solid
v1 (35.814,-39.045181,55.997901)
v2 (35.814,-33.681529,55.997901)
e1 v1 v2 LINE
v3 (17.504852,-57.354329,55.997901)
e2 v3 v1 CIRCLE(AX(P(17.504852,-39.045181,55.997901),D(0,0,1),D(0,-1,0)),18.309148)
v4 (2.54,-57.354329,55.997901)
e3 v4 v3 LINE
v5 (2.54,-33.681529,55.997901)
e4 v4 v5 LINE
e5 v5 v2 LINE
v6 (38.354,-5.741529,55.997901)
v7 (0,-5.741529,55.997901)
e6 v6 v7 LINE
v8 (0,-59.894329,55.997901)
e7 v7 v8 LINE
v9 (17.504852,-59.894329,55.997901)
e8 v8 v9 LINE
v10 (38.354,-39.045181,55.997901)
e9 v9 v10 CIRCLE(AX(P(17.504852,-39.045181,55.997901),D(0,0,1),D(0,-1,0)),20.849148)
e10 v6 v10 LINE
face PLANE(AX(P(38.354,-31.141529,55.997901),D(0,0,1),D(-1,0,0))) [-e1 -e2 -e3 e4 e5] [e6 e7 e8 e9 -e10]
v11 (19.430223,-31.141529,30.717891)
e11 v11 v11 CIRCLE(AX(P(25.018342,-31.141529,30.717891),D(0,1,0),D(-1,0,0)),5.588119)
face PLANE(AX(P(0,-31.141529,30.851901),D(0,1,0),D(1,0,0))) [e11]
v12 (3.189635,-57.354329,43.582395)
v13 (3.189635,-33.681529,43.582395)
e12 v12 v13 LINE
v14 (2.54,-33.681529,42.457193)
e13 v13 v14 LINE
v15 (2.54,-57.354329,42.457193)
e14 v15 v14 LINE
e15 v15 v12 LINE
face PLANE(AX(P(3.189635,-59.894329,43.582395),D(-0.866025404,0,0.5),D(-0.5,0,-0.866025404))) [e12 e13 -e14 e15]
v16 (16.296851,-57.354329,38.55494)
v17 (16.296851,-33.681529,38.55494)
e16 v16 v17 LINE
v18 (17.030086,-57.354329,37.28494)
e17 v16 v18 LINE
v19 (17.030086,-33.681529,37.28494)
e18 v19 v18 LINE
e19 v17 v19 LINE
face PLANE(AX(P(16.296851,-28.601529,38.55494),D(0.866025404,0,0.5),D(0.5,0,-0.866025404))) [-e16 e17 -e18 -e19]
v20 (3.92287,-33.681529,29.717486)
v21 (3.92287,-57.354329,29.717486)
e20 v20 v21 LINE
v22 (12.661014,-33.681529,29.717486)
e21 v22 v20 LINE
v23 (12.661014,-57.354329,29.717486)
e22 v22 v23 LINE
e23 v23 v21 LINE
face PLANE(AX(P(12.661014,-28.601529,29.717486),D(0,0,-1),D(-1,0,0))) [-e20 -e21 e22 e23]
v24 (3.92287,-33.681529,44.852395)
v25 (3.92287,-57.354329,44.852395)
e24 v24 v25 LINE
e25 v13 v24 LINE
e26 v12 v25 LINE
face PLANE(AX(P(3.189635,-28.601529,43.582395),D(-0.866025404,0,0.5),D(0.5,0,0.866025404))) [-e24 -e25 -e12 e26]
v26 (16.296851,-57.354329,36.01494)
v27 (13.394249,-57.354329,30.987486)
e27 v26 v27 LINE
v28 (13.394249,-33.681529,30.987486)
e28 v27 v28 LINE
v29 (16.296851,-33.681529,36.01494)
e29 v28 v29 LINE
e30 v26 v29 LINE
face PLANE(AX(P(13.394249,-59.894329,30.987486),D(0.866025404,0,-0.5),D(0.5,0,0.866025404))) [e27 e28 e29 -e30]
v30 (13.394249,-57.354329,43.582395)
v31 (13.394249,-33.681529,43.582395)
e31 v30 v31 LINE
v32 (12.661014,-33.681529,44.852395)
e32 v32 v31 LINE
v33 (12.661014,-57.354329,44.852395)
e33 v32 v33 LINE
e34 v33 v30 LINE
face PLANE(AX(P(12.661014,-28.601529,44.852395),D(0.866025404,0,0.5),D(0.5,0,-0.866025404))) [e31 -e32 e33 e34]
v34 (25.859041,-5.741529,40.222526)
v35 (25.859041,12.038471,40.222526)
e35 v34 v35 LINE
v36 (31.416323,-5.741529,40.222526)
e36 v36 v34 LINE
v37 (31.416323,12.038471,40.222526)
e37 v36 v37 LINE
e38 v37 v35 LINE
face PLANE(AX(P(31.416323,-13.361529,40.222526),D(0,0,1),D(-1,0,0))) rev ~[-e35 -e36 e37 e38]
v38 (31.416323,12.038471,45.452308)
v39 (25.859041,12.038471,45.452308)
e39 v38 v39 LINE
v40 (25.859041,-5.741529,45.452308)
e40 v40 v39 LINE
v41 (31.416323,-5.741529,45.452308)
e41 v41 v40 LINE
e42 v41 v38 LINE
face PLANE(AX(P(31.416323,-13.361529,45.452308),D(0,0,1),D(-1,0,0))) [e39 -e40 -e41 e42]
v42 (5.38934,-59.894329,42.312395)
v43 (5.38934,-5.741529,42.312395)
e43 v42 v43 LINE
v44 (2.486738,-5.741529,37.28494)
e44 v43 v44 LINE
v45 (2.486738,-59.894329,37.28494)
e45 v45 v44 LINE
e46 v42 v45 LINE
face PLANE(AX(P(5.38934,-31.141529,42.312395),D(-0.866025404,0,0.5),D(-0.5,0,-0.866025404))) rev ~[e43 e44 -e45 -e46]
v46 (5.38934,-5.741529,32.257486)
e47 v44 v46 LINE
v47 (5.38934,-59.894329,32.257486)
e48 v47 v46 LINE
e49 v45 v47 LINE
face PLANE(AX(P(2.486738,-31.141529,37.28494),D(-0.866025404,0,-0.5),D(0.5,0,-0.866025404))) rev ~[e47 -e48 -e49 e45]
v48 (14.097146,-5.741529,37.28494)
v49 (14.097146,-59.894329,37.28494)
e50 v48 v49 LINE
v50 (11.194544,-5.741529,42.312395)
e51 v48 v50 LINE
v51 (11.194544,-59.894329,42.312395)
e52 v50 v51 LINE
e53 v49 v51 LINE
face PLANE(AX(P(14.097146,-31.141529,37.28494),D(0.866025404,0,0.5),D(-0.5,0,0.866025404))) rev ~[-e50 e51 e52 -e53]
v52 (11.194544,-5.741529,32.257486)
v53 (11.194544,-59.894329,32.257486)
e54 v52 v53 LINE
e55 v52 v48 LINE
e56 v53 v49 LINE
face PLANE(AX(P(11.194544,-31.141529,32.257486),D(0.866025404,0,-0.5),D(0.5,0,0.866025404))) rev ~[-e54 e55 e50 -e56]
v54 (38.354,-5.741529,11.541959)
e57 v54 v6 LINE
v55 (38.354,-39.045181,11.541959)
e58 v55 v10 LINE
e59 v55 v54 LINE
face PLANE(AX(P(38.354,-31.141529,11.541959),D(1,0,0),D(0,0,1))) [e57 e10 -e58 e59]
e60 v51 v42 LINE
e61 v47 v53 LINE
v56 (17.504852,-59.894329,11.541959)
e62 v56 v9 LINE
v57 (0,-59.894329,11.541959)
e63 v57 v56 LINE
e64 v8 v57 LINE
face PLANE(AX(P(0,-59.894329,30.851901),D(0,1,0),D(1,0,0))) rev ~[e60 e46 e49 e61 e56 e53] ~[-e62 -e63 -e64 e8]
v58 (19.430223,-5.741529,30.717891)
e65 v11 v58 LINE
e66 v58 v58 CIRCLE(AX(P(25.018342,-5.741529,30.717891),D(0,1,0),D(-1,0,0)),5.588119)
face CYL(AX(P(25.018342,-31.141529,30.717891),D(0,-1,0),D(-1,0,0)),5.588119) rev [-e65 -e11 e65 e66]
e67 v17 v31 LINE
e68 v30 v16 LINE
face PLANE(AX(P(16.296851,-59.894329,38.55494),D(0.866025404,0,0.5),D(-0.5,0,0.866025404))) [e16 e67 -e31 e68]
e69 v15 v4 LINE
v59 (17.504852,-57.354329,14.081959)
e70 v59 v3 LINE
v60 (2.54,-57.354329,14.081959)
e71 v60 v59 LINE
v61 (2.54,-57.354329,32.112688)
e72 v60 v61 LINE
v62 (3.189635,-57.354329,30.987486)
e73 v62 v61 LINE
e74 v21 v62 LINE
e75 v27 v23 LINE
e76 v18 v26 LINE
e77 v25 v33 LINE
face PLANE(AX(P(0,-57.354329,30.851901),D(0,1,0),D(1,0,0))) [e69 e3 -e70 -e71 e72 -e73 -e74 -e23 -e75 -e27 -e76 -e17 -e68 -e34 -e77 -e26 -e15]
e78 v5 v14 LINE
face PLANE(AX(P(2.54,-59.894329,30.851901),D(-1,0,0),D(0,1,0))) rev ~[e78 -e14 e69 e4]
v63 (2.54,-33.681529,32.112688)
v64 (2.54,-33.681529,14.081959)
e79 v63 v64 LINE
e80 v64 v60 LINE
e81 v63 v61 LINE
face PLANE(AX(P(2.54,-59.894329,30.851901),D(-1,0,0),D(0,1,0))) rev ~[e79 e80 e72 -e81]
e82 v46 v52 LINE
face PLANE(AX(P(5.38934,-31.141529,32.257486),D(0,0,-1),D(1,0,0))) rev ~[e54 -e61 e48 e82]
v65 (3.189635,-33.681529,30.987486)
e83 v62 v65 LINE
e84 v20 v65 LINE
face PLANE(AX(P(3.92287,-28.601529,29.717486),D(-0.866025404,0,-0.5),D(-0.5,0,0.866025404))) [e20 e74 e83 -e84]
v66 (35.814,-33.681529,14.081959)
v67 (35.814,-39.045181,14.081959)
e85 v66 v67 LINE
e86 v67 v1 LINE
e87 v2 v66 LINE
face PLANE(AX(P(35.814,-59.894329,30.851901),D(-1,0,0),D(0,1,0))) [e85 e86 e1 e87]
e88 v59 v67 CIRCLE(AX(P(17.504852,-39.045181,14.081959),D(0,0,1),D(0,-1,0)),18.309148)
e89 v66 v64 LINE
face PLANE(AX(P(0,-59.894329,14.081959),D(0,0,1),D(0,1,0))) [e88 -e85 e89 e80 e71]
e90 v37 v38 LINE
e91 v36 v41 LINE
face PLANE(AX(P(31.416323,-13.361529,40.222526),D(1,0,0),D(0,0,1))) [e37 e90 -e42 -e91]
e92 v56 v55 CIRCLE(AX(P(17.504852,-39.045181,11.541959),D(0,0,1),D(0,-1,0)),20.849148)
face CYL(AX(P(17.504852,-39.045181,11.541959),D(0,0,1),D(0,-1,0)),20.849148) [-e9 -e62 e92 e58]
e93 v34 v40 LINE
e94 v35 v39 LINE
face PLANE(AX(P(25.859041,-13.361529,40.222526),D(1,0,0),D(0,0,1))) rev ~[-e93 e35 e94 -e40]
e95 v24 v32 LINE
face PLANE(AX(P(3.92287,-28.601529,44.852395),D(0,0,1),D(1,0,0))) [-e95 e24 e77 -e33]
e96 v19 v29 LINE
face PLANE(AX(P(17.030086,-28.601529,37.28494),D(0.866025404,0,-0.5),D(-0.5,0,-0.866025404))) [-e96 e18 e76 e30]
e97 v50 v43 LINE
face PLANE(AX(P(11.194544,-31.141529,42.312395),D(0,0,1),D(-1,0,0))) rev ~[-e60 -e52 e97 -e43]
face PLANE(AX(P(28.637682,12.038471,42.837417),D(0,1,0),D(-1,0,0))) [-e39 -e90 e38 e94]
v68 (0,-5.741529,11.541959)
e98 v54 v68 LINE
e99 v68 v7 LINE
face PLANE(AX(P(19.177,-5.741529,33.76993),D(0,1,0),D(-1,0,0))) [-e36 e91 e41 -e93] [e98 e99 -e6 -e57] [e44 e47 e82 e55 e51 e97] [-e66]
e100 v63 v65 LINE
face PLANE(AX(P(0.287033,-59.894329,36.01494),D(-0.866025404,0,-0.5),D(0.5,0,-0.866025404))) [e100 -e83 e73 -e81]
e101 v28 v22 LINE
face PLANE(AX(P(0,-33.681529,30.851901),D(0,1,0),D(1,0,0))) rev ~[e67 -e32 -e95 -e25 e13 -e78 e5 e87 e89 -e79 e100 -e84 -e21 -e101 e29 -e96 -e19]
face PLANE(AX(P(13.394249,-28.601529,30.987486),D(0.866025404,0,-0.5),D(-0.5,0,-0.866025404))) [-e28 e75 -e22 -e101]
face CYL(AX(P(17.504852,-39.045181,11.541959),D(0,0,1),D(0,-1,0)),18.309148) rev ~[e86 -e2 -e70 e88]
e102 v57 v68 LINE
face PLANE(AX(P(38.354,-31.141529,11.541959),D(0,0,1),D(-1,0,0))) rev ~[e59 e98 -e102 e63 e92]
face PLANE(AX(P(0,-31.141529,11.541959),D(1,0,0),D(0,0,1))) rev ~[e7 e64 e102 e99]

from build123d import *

# Parameters (mm, degrees)
F0_W        = 28.7528
F0_H        = 19.3099416792
F1_DEPTH    = 38.354
F2_DEPTH    = 25.146
F3_R        = 20.8491483247
F5_DEPTH    = 29.972
F6_T        = 2.54
F6_T3_DEPTH = 33.8328
F8_W        = 5.5572818965
F8_H        = 5.2297823131
F9_DEPTH    = 17.78
F9_FACE_W   = 5.5572818965
F9_FACE_H   = 5.2297823131
F7_W        = 38.354
F7_H        = 44.4559416792
F7_R        = 5.5881190885
F10_DEPTH   = 25.4


# Not quite as in the source:
# - a shell that OpenCascade refuses in one call is made with other operations: the cavity is built on its own and cut out


with BuildPart() as f1:
    # F0 (on Right) → F1 (new body)
    with BuildSketch(Plane.YZ):
        with Locations((-45.5179288597, 21.1969297379)):
            Rectangle(F0_W, F0_H)
    extrude(amount=F1_DEPTH)

    # F2 (add): a face of the model
    f2_faces = [f1.faces().sort_by_distance(p)[0] for p in [
        (19.177, -45.5179288597, 30.8519005775),
    ]]
    extrude(f2_faces, amount=F2_DEPTH)

    # F3
    f3_edges = [f1.edges().sort_by_distance(p)[0] for p in [
        (38.354, -59.894329, 33.76993),
    ]]
    fillet(f3_edges, radius=F3_R)

    # F4 (on face) → F5 (cut)
    with BuildSketch(Plane.XZ.offset(59.8943288597)):
        Polygon((5.3893399472, 32.2574861348), (11.1945441877, 32.2574861348), (14.0971463079, 37.2849404812), (11.1945441877, 42.3123948276), (5.3893399472, 42.3123948276), (2.486737827, 37.2849404812), align=None)
    extrude(amount=-F5_DEPTH, mode=Mode.SUBTRACT)

    # F6: shell of thickness 2.54, made by hand


with BuildPart() as f6_core1:
    # F6_t2: copy of F1
    add(f1.part)

    # the walls: a layer under each face that stays
    f6_faces = [f6_core1.faces().sort_by_distance(p)[0] for p in [
        (14.5873763961, -59.8943288597, 48.5885769643),
        (19.177, -45.5179288597, 11.5419588983),
        (32.2474258377, -53.7877546974, 33.7699297379),
        (0, -45.5179288597, 33.7699297379),
        (3.9380388871, -45.5179288597, 39.7986676544),
        (8.2919420674, -45.5179288597, 42.3123948276),
        (12.6458452478, -45.5179288597, 39.7986676544),
        (12.6458452478, -45.5179288597, 34.771213308),
        (8.2919420674, -45.5179288597, 32.2574861348),
        (3.9380388871, -45.5179288597, 34.771213308),
        (38.354, -35.0933546974, 33.7699297379),
        (19.177, -31.1415288597, 33.7699297379),
    ]]
    thicken(f6_faces, amount=-F6_T, mode=Mode.SUBTRACT)

    # F6_s4 → F6_t3 (cut)
    with BuildSketch(Plane.XZ.offset(28.6015288597)):
        Polygon((2.5307319175, 37.2849404812), (0.2870333013, 38.5549404812), (-0.4462015405, 37.2849404812), (0.2870333013, 36.0149404812), align=None)
        Polygon((5.4113369925, 42.2742948276), (3.1896354216, 43.5823948276), (3.9228702635, 44.8523948276), (5.3893399472, 44.8523948276), align=None)
        Polygon((11.1725471424, 42.2742948276), (11.1945441877, 44.8523948276), (12.6610138714, 44.8523948276), (13.3942487133, 43.5823948276), align=None)
        Polygon((14.0531522174, 37.2849404812), (16.2968508335, 38.5549404812), (17.0300856754, 37.2849404812), (16.2968508335, 36.0149404812), align=None)
        Polygon((11.1725471424, 32.2955861348), (13.3942487133, 30.9874861348), (12.6610138714, 29.7174861348), (11.1945441877, 29.7174861348), align=None)
        Polygon((5.4113369925, 32.2955861348), (5.3893399472, 29.7174861348), (3.9228702635, 29.7174861348), (3.1896354216, 30.9874861348), align=None)
    extrude(amount=F6_T3_DEPTH, mode=Mode.SUBTRACT)


with BuildPart() as f1_1:
    add(f1.part)

    # what is left inside the walls is the cavity
    f6_cavity = [f6_core1.part.solids().sort_by_distance(p)[0] for p in [
        (24.722667, -33.706929, 35.03993),
    ]]
    add(f6_cavity, mode=Mode.SUBTRACT)

    # F8 (on face) → F9 (join)
    with BuildSketch(Plane(origin=(0, -31.1415288597, 0), x_dir=(-1, 0, 0), z_dir=(0, 1, 0))):
        with Locations((-28.6376820877, 42.8374167532)):
            Rectangle(F8_W, F8_H)
    extrude(amount=F9_DEPTH)

    # F9_face (on face) + F7 (on face) → F10 (join)
    with BuildSketch(Plane(origin=(28.6376820877, -13.3615288597, 42.8374167532), x_dir=(-1, 0, 0), z_dir=(0, 1, 0))):
        Rectangle(F9_FACE_W, F9_FACE_H)
    with BuildSketch(Plane(origin=(0, -31.1415288597, 0), x_dir=(-1, 0, 0), z_dir=(0, 1, 0))):
        with Locations((-19.177, 33.7699297379)):
            Rectangle(F7_W, F7_H)
        with Locations((-25.0183418393, 30.7178907096)):
            Circle(F7_R, mode=Mode.SUBTRACT)
        Polygon((-5.3893399472, 42.3123948276), (-2.486737827, 37.2849404812), (-5.3893399472, 32.2574861348), (-11.1945441877, 32.2574861348), (-14.0971463079, 37.2849404812), (-11.1945441877, 42.3123948276), align=None, mode=Mode.SUBTRACT)
    extrude(amount=F10_DEPTH)


solid = f1_1.part
